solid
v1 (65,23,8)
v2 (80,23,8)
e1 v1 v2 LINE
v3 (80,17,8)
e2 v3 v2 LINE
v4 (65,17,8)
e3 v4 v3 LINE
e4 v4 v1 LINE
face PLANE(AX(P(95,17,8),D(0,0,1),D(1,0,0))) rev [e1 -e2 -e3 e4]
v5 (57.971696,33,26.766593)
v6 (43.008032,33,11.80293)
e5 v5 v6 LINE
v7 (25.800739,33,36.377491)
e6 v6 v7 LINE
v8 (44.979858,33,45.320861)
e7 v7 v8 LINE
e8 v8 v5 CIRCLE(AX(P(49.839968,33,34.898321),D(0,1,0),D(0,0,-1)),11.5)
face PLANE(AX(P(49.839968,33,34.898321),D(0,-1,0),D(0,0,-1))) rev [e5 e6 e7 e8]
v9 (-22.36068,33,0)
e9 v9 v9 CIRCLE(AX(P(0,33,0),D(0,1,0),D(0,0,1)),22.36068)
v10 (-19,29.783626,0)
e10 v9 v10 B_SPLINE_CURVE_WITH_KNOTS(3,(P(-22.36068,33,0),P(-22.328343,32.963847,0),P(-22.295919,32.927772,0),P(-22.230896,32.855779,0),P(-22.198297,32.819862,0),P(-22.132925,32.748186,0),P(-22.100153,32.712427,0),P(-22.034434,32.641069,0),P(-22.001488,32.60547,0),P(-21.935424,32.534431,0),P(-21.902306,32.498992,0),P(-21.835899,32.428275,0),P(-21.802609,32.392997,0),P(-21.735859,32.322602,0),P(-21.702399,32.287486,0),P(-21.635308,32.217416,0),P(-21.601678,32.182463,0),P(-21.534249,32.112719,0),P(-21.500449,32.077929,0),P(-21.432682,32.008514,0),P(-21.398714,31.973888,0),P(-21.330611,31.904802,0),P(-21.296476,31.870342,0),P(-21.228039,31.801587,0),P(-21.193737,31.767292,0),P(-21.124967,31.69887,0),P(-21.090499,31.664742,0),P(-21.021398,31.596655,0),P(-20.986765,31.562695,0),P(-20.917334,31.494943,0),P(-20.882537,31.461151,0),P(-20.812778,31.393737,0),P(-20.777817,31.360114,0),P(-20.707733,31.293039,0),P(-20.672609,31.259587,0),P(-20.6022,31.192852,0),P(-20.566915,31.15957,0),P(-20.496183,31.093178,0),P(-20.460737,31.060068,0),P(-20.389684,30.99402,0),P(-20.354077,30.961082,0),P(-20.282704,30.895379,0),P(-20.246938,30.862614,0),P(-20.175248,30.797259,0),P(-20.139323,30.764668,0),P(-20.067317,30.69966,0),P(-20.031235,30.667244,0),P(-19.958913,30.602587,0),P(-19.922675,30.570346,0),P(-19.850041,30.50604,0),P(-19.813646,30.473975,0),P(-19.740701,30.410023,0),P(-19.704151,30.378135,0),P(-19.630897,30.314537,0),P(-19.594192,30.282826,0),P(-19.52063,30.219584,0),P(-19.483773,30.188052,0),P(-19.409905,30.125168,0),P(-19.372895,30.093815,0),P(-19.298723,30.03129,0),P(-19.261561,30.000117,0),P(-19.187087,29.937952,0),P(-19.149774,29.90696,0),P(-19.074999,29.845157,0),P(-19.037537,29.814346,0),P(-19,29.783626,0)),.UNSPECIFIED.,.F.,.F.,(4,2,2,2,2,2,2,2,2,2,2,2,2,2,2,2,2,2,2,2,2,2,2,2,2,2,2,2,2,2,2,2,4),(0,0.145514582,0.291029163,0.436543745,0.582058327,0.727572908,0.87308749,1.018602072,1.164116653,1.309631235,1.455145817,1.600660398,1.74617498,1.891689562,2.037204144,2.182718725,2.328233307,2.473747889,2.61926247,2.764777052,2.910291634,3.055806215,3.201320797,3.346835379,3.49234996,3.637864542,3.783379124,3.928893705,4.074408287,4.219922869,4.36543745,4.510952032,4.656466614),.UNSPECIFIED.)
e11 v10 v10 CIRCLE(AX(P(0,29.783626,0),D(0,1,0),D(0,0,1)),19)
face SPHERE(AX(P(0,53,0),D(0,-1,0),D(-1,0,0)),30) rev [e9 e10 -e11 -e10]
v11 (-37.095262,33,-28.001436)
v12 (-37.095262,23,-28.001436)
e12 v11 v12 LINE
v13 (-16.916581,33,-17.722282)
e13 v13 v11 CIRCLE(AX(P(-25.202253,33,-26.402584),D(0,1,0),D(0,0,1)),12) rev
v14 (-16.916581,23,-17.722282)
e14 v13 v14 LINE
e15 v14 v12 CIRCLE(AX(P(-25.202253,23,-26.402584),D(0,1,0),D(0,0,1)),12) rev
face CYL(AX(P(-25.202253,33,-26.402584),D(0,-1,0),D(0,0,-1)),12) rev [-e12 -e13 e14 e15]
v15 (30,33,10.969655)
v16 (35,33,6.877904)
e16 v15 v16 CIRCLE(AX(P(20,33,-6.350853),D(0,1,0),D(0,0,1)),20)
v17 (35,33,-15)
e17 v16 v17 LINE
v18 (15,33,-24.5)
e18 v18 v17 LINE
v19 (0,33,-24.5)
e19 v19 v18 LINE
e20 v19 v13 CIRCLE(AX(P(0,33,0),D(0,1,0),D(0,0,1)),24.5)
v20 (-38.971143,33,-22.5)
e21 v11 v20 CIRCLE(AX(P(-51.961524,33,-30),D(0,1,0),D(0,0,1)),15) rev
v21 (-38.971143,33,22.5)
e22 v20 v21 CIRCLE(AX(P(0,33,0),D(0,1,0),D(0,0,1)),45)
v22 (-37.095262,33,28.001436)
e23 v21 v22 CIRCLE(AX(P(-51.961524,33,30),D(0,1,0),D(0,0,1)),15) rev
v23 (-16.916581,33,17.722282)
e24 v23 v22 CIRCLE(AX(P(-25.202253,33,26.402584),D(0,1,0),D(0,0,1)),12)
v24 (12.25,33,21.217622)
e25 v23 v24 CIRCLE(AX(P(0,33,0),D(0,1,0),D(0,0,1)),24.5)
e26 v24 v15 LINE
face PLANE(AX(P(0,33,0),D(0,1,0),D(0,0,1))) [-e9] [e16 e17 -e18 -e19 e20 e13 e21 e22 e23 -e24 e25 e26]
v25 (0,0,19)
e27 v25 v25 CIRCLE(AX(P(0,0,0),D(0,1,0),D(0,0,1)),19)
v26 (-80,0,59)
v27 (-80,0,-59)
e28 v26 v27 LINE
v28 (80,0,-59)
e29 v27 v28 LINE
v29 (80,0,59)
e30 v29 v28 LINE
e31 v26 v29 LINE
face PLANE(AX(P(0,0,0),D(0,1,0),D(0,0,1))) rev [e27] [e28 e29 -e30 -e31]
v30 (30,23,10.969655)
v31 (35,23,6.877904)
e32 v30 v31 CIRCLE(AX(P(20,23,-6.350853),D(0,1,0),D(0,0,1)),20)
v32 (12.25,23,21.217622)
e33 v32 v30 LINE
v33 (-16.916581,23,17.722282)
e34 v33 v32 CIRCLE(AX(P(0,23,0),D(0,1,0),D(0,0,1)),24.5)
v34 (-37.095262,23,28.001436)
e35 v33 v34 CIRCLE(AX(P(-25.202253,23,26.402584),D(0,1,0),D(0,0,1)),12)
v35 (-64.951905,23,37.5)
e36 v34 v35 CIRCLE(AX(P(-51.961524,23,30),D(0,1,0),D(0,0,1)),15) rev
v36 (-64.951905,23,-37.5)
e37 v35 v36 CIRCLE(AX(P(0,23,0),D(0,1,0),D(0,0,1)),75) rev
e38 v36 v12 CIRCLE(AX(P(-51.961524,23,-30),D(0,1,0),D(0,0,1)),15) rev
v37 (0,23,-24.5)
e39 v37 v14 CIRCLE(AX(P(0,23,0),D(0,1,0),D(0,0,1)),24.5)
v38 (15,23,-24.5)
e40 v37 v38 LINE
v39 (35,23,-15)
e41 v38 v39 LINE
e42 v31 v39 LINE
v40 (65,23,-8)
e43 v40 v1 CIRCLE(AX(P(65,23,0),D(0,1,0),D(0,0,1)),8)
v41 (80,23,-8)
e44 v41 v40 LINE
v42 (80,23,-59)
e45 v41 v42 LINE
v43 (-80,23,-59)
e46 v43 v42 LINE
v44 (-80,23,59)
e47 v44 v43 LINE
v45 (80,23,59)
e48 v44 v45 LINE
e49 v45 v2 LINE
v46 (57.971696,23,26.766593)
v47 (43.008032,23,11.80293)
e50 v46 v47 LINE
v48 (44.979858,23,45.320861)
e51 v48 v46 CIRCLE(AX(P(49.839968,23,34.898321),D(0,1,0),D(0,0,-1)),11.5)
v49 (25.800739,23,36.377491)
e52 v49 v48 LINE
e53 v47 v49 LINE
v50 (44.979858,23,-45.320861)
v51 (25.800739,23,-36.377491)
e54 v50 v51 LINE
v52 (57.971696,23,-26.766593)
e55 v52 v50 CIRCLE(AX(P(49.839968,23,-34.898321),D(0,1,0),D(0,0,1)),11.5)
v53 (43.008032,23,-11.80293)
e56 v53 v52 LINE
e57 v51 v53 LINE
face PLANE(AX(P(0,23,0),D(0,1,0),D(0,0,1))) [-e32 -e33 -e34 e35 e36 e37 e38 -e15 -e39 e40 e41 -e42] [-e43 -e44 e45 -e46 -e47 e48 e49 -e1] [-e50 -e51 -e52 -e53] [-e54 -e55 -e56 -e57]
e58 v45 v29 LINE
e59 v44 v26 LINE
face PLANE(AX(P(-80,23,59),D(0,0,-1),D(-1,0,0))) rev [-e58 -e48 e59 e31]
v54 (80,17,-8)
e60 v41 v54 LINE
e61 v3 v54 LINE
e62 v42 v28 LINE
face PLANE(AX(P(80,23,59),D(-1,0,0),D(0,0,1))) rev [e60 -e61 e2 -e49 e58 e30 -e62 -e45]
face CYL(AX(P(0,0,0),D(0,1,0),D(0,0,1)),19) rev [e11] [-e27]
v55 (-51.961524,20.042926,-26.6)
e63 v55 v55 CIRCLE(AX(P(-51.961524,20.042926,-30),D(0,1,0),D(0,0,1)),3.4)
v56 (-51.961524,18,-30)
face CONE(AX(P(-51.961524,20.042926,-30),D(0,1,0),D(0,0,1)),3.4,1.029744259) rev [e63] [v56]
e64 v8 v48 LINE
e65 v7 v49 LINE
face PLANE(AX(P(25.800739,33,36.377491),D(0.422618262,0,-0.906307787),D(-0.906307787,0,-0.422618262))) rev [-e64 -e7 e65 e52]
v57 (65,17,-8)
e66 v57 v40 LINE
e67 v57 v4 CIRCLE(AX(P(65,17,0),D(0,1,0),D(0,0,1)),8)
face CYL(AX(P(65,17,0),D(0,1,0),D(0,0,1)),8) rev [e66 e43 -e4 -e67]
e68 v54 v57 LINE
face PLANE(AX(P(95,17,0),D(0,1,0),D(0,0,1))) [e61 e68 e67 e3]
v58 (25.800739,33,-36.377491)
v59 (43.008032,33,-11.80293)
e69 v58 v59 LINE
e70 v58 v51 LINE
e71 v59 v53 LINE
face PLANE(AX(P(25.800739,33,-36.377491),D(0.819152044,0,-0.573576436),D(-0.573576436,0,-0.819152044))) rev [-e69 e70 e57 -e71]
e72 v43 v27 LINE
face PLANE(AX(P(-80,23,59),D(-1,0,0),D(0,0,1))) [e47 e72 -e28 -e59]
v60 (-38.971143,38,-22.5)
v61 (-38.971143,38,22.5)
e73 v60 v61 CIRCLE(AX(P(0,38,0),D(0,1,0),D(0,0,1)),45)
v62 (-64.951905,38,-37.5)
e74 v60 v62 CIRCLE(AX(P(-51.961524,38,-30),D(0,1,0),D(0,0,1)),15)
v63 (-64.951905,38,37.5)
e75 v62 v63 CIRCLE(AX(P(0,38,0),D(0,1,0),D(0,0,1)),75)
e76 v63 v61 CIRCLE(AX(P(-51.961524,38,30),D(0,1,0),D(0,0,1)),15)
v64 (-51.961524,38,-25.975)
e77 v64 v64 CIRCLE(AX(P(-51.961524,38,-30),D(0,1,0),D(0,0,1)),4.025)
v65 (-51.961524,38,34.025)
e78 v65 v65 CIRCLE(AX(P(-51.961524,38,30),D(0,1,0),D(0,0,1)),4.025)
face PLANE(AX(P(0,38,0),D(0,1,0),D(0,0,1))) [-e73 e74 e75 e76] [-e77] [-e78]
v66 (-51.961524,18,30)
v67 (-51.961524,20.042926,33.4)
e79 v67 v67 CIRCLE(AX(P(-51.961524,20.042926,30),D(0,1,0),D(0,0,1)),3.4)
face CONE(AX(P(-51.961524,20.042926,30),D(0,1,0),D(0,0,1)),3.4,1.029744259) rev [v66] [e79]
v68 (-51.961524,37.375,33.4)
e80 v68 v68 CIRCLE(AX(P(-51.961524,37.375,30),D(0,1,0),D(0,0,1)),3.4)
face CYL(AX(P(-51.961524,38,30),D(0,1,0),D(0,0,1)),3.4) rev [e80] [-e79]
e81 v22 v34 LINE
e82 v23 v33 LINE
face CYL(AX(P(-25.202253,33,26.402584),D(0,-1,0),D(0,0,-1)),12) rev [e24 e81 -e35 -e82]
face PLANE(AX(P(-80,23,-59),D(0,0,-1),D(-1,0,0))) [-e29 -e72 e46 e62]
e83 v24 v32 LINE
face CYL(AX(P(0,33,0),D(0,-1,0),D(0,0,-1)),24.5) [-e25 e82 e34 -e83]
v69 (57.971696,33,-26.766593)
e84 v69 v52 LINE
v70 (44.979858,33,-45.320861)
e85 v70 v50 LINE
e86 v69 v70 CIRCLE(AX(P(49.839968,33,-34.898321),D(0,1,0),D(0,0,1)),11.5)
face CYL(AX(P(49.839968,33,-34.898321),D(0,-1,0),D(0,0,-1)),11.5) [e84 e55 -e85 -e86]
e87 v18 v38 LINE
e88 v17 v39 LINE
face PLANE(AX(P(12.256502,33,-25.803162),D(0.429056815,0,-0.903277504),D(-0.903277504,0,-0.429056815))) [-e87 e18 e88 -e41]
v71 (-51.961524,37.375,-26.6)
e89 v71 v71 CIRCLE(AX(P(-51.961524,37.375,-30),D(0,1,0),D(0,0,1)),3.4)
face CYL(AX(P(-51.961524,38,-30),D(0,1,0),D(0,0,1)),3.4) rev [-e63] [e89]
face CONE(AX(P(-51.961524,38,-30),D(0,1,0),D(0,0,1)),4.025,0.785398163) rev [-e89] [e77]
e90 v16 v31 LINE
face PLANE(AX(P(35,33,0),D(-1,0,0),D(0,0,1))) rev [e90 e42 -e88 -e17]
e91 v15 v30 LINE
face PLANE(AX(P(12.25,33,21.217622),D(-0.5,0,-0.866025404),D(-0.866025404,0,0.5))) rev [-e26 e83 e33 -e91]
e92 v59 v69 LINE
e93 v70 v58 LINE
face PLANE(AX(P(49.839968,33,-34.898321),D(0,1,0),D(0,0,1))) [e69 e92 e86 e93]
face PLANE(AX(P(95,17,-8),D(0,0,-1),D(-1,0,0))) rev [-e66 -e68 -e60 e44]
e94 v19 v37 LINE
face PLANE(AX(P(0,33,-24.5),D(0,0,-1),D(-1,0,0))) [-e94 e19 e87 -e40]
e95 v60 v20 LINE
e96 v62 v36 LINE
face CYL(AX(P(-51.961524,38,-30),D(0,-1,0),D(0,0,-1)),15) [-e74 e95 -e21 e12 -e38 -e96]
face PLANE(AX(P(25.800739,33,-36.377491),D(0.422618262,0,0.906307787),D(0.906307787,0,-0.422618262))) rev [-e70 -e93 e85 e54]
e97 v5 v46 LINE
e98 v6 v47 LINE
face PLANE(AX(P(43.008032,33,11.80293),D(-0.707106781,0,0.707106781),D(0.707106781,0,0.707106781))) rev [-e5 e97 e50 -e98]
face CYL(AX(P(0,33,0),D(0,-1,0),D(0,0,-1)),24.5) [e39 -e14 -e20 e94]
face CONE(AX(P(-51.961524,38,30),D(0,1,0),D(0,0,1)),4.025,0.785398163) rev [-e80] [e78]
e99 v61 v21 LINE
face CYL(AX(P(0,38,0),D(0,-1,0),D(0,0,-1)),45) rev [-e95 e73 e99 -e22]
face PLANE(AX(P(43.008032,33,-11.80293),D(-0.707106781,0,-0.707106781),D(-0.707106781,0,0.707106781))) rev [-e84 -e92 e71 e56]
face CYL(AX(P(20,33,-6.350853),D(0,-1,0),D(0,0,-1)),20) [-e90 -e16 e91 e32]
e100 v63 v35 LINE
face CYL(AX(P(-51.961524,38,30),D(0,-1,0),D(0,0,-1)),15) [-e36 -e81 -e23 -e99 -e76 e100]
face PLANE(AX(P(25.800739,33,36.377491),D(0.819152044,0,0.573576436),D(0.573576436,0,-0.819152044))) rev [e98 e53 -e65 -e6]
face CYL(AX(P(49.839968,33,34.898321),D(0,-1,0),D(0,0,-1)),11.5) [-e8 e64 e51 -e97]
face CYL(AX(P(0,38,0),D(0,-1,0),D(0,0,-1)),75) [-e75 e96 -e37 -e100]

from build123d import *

# Parameters (mm, degrees)
SKETCH_1_W                   = 160
SKETCH_1_H                   = 118
EXTRUDE_1_DEPTH              = 23
EXTRUDE_2_DEPTH              = 38
HOLE_WIZARD_M8_2_D           = 6.8
HOLE_WIZARD_M8_2_DEPTH       = 17.957073895
HOLE_WIZARD_M8_2_CSINK_D     = 8.05
HOLE_WIZARD_M8_2_CSINK_ANGLE = 90
HOLE_WIZARD_M8_2_TIP         = 2.042926105
EXTRUDE_3_DEPTH              = 10
EXTRUDE_4_DEPTH              = 10
SKETCH_9_R                   = 19
CUT_EXTRUDE_1_DEPTH          = 105.737767782
CUT_EXTRUDE_2_DEPTH          = 6


with BuildPart() as part:
    # 草图1 → 凸台-拉伸1 (new body)
    with BuildSketch(Plane(origin=(0, 0, 0), x_dir=(1, 0, 0), z_dir=(0, 1, 0))):
        Rectangle(SKETCH_1_W, SKETCH_1_H)
    extrude(amount=EXTRUDE_1_DEPTH)

    # 草图1<3> → 凸台-拉伸2 (add)
    with BuildSketch(Plane(origin=(0, 0, 0), x_dir=(1, 0, 0), z_dir=(0, 1, 0))):
        with BuildLine():
            ThreePointArc((-38.97114317, 22.5), (-44.461524227, 42.990381057), (-64.951905284, 37.5))
            ThreePointArc((-64.951905284, 37.5), (-75, 0), (-64.951905284, -37.5))
            ThreePointArc((-64.951905284, -37.5), (-44.461524227, -42.990381057), (-38.97114317, -22.5))
            ThreePointArc((-38.97114317, -22.5), (-45, 0), (-38.97114317, 22.5))
        make_face()
    extrude(amount=EXTRUDE_2_DEPTH)

    # M8 螺纹孔2
    with Locations(Plane(origin=(0, 38, 0), x_dir=(1, 0, 0), z_dir=(0, 1, 0))):
        with Locations((-51.961524227, 30), (-51.961524227, -30)):
            CounterSinkHole(HOLE_WIZARD_M8_2_D / 2, HOLE_WIZARD_M8_2_CSINK_D / 2, depth=HOLE_WIZARD_M8_2_DEPTH, counter_sink_angle=HOLE_WIZARD_M8_2_CSINK_ANGLE)
            with Locations((0, 0, -(HOLE_WIZARD_M8_2_DEPTH + HOLE_WIZARD_M8_2_TIP / 2))):  # 118° drill point
                Cone(0, HOLE_WIZARD_M8_2_D / 2, HOLE_WIZARD_M8_2_TIP, mode=Mode.SUBTRACT)

    # 草图6 → 凸台-拉伸3 (add)
    with BuildSketch(Plane(origin=(0, 23, 0), x_dir=(1, 0, 0), z_dir=(0, 1, 0))):
        with BuildLine():
            Line((15, 24.5), (0, 24.5))
            ThreePointArc((0, 24.5), (-9.111917465, 22.742536361), (-16.916580755, 17.722282459))
            ThreePointArc((-16.916580755, 17.722282459), (-30.649129847, 15.709991673), (-37.095262413, 28.001435595))
            ThreePointArc((-37.095262413, 28.001435595), (-37.764179884, 25.158986305), (-38.97114317, 22.5))
            ThreePointArc((-38.97114317, 22.5), (-45, 0), (-38.97114317, -22.5))
            ThreePointArc((-38.97114317, -22.5), (-37.764179884, -25.158986305), (-37.095262413, -28.001435595))
            ThreePointArc((-37.095262413, -28.001435595), (-30.649129847, -15.709991673), (-16.916580755, -17.722282459))
            ThreePointArc((-16.916580755, -17.722282459), (-2.915234862, -24.325941003), (12.25, -21.217622393))
            Line((12.25, -21.217622393), (30, -10.969655115))
            ThreePointArc((30, -10.969655115), (32.66631784, -9.127014863), (35, -6.877903594))
            Line((35, -6.877903594), (35, 15))
            Line((35, 15), (15, 24.5))
        make_face()
    extrude(amount=EXTRUDE_3_DEPTH)

    # 草图8 → 凸台-拉伸4 (add)
    with BuildSketch(Plane(origin=(0, 23, 0), x_dir=(1, 0, 0), z_dir=(0, 1, 0))):
        with BuildLine():
            Line((25.800739315, 36.377490991), (43.008032405, 11.802929662))
            Line((43.008032405, 11.802929662), (57.971696229, 26.766593486))
            ThreePointArc((57.971696229, 26.766593486), (59.260216754, 41.494450487), (44.979858235, 45.32086102))
            Line((44.979858235, 45.32086102), (25.800739315, 36.377490991))
        make_face()
        with BuildLine():
            Line((43.008032405, -11.802929662), (57.971696229, -26.766593486))
            ThreePointArc((57.971696229, -26.766593486), (59.260216754, -41.494450487), (44.979858235, -45.32086102))
            Line((44.979858235, -45.32086102), (25.800739315, -36.377490991))
            Line((25.800739315, -36.377490991), (43.008032405, -11.802929662))
        make_face()
    extrude(amount=EXTRUDE_4_DEPTH)

    # 草图9 → 切除-拉伸1 (cut, through all)
    with BuildSketch(Plane(origin=(0, 33, 0), x_dir=(1, 0, 0), z_dir=(0, 1, 0))):
        Circle(SKETCH_9_R)
    extrude(amount=-CUT_EXTRUDE_1_DEPTH, mode=Mode.SUBTRACT)

    # 草图10 → 切除-旋转5 (revolve, cut)
    with BuildSketch(Plane.XY):
        with BuildLine():
            Line((0, 83), (0, 23))
            ThreePointArc((0, 23), (21.213203436, 31.786796564), (30, 53))
            ThreePointArc((30, 53), (21.213203436, 74.213203436), (0, 83))
        make_face()
    revolve(axis=Axis((0, 23, 0), (0, 1, 0)), mode=Mode.SUBTRACT)

    # 草图11 → 切除-拉伸2 (cut)
    with BuildSketch(Plane(origin=(0, 23, 0), x_dir=(1, 0, 0), z_dir=(0, 1, 0))):
        with BuildLine():
            Line((95, -8), (65, -8))
            ThreePointArc((65, -8), (57, 0), (65, 8))
            Line((65, 8), (95, 8))
            ThreePointArc((95, 8), (103, 0), (95, -8))
        make_face()
    extrude(amount=-CUT_EXTRUDE_2_DEPTH, mode=Mode.SUBTRACT)


solid = part.part
